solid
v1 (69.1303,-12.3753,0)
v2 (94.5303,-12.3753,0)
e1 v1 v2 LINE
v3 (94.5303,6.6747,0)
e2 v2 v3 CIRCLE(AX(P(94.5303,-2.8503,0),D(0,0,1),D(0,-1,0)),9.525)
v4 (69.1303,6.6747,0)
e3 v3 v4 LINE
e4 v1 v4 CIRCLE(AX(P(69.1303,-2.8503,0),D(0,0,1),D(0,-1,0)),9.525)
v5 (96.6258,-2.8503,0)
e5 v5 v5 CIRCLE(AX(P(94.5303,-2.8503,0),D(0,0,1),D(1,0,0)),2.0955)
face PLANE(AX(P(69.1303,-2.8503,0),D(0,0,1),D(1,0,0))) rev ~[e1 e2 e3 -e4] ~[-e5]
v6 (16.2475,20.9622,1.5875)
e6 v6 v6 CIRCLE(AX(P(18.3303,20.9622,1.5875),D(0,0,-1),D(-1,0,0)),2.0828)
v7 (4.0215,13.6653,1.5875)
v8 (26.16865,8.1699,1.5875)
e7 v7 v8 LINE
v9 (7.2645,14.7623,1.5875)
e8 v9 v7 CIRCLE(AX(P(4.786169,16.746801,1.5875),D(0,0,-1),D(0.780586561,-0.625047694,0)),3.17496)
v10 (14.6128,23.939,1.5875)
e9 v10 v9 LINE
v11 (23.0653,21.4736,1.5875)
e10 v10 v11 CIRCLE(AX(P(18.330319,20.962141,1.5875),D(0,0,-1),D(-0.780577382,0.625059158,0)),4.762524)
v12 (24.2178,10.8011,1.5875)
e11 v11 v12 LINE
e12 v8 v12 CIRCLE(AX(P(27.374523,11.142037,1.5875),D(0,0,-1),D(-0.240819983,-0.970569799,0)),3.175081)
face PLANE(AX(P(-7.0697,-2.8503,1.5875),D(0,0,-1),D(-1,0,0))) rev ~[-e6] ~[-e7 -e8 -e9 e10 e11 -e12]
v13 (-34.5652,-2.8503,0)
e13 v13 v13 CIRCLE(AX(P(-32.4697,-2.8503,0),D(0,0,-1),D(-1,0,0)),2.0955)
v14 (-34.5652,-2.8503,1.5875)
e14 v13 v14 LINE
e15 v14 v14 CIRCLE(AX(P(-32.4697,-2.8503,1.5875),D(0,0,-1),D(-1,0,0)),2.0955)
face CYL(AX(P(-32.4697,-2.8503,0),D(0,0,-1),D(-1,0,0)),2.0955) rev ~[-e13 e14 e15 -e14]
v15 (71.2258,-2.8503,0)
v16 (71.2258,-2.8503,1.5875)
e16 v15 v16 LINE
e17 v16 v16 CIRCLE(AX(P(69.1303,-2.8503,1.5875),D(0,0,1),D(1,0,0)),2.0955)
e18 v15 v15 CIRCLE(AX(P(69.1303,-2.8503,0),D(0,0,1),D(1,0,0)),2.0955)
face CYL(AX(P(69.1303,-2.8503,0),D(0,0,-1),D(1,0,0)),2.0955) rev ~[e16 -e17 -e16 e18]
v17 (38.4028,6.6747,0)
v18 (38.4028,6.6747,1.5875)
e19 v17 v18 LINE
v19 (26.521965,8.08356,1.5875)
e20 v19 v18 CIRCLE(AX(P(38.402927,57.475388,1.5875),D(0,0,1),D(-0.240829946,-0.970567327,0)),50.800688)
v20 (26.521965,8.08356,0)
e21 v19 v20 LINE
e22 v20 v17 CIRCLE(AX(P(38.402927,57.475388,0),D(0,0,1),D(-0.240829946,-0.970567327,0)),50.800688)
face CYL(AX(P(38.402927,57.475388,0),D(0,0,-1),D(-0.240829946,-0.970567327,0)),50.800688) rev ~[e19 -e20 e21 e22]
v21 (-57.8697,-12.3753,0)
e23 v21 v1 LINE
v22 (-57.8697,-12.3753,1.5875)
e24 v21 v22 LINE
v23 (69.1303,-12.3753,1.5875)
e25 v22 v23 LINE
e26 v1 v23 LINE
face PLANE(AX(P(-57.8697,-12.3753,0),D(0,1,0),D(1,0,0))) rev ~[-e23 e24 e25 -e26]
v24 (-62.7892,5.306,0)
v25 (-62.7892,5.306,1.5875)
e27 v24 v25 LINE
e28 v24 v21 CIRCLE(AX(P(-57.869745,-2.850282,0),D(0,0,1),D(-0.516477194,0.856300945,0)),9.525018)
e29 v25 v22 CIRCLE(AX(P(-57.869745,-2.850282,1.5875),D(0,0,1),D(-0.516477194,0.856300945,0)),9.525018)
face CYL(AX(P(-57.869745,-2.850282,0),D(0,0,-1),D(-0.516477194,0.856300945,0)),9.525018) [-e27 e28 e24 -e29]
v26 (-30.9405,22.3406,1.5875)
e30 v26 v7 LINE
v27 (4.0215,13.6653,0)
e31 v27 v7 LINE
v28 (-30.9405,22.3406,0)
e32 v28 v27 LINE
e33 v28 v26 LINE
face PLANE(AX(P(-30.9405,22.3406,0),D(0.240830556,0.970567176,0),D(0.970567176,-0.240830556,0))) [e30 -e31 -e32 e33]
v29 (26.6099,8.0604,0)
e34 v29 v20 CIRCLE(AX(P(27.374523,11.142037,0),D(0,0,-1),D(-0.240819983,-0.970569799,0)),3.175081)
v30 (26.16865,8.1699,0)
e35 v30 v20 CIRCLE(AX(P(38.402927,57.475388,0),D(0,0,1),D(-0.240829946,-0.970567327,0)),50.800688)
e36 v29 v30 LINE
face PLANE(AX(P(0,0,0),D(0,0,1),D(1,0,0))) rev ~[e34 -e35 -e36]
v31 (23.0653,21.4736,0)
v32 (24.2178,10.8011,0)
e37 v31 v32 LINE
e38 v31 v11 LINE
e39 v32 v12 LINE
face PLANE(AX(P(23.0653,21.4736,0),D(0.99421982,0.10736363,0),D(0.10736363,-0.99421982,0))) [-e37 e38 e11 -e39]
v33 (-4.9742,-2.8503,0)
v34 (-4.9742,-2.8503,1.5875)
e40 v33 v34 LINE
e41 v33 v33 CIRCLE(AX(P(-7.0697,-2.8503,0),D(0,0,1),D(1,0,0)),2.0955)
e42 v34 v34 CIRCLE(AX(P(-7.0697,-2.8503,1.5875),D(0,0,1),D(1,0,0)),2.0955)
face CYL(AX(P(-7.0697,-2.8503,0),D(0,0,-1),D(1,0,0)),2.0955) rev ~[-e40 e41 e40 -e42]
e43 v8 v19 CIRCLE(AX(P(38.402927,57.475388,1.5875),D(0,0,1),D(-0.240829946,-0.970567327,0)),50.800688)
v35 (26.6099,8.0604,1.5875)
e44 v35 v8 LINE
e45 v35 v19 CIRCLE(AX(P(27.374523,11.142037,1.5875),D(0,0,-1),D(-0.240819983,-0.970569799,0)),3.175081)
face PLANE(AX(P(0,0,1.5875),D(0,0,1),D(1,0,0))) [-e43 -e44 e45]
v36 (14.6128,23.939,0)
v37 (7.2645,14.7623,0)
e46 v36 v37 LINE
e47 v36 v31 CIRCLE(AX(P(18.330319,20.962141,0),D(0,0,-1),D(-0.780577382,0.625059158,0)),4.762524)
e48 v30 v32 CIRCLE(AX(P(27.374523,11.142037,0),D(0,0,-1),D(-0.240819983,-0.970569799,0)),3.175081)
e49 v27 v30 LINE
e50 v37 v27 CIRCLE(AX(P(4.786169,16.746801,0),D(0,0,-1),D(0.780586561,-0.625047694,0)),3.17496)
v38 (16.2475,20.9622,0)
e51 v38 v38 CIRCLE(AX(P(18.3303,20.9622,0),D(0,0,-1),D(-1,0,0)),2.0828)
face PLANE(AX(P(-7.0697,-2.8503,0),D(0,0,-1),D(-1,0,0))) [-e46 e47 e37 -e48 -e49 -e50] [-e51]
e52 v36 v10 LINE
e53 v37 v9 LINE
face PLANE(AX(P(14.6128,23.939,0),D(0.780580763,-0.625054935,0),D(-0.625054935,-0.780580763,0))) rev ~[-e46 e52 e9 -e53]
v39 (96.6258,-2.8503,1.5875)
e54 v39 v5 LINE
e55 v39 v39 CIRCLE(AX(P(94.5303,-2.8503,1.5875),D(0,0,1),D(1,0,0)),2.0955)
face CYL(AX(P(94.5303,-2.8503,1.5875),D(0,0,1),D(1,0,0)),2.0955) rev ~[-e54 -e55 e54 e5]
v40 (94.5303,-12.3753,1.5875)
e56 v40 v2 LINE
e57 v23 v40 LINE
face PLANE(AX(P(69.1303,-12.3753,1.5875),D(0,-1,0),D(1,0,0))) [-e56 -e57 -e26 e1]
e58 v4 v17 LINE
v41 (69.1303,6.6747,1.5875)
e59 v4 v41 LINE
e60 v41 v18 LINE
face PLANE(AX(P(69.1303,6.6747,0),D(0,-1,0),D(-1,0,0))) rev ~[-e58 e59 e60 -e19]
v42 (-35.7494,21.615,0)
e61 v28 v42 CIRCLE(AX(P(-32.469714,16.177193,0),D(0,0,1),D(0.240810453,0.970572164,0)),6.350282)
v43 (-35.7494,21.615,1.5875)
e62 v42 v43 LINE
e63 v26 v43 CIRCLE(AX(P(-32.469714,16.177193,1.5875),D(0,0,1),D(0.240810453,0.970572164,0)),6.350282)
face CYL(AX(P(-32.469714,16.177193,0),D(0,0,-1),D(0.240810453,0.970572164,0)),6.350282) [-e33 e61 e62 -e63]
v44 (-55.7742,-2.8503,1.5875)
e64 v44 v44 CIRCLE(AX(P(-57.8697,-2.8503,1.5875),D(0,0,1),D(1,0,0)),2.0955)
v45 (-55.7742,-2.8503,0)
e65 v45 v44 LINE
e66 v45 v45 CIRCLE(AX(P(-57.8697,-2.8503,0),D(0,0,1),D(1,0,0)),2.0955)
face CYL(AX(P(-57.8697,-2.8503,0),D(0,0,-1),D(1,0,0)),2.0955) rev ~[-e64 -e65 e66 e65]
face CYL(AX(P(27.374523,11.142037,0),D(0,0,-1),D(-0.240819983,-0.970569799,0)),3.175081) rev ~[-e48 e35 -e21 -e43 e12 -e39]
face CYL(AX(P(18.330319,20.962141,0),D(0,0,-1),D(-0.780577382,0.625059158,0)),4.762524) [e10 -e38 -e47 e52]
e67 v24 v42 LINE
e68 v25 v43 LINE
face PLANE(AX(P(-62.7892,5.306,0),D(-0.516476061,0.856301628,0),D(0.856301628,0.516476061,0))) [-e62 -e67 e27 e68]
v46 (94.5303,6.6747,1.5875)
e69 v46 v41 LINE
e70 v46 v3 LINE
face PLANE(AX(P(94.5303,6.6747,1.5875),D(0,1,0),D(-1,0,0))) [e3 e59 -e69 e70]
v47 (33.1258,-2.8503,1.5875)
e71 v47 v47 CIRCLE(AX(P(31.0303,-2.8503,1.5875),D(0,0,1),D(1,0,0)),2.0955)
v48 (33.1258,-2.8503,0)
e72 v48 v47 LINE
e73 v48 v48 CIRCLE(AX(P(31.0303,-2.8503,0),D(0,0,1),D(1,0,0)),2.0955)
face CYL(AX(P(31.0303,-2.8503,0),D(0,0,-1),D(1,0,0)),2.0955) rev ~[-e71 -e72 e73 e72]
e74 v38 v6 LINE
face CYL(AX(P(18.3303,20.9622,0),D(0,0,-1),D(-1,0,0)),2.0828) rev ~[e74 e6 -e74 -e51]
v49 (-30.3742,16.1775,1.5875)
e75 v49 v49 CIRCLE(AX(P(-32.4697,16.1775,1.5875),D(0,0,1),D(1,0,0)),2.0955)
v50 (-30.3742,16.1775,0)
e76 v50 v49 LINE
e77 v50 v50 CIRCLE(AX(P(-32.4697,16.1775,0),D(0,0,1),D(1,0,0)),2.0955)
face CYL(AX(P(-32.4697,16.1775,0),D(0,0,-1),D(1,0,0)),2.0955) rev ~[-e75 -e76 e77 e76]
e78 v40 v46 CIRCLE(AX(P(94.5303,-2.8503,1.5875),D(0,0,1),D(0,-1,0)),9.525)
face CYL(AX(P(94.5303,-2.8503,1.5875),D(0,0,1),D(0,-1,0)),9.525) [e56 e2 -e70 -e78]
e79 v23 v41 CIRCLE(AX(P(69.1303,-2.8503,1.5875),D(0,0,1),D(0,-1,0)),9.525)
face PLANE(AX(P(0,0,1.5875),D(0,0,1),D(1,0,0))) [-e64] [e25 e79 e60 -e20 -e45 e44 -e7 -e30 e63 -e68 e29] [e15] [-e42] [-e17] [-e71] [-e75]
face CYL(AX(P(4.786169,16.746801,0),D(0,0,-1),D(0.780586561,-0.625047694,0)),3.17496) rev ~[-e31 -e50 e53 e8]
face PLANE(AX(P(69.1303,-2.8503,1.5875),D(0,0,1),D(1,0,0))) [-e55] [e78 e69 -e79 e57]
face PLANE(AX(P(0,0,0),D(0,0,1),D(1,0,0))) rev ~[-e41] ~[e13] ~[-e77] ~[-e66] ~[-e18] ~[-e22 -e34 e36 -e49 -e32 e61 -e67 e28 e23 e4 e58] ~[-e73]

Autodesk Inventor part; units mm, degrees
ref_plane "YZ Plane" through (0, 0, 0) normal (1, 0, 0) x (0, 1, 0)
ref_plane "XZ Plane" through (0, 0, 0) normal (0, 1, 0) x (-1, 0, 0)
ref_plane "XY Plane" through (0, 0, 0) normal (0, 0, 1) x (1, 0, 0)
sketch "Sketch1" plane through (0, 0, 0) normal (0, 0, 1) x (1, 0, 0)
  circle A0 centre (-57.8697, -2.8503) radius 2.0955
  circle A1 centre (-7.0697, -2.8503) radius 2.0955
  circle A2 centre (31.0303, -2.8503) radius 2.0955
  circle A3 centre (69.1303, -2.8503) radius 2.0955
  arc A4 (-62.7892, 5.306) -> (-57.8697, -12.3753) centre (-57.8697, -2.8503) ccw
  arc A5 (-30.9405, 22.3406) -> (-35.7494, 21.615) centre (-32.4697, 16.1775) ccw
  arc A6 (69.1303, -12.3753) -> (69.1303, 6.6747) centre (69.1303, -2.8503) ccw
  line L0 (-57.8697, -12.3753) -> (69.1303, -12.3753)
  line L1 (-62.7892, 5.306) -> (-35.1787, 21.9592)
  line L2 (69.1303, 6.6747) -> (38.4028, 6.6747)
  line L3 (-30.9405, 22.3406) -> (26.1686, 8.1699)
  arc A7 (26.1686, 8.1699) -> (38.4028, 6.6747) centre (38.4028, 57.4747) ccw
  circle A8 centre (-32.4697, 16.1775) radius 2.0955
  point P0 (0, 0)
  dimension "d0" = 4.191
  dimension "d1" = 4.191
  dimension "d2" = 4.191
  dimension "d3" = 4.191
  dimension "d4" = 50.8
  dimension "d5" = 4.191
extrude "Extrusion1" add sketch "Sketch1" along normal blind 1.5875
sketch "Sketch2" plane through (-7.0697, -2.8503, 0) normal (0, 0, -1) x (-1, 0, 0)
  circle A0 centre (25.4, 0) radius 2.0955
  point P0 (-7.0697, 2.8503)
  dimension "d8" = 4.191
extrude "Extrusion2" cut sketch "Sketch2" against normal blind 1.5875
sketch "Sketch3" plane through (-7.0697, -2.8503, 0) normal (0, 0, -1) x (-1, 0, 0)
  line L0 (-21.6825, 26.7893) -> (-14.3342, 17.6126)
  line L1 (-30.135, 24.3239) -> (-31.2875, 13.6514)
  line L2 (-33.2384, 11.0202) -> (23.8707, 25.1909) projected
  line L3 (-33.6796, 10.9107) -> (-33.2384, 11.0202)
  arc A0 (-33.6796, 10.9107) -> (-31.2875, 13.6514) centre (-34.4442, 13.9923) ccw
  line L4 (23.8707, 25.1909) -> (-11.0912, 16.5156)
  arc A1 (-14.3342, 17.6126) -> (-11.0912, 16.5156) centre (-11.8558, 19.5972) ccw
  circle A2 centre (-25.4, 23.8125) radius 2.0828
  arc A3 (-21.6825, 26.7893) -> (-30.135, 24.3239) centre (-25.4, 23.8125) ccw
  point P0 (-7.0697, 2.8503)
  point P1 (-13.3897, 15.9453)
  point P2 (-13.0638, 16.0262)
  dimension "d19" = 3.175
  dimension "d20" = 3.175
  dimension "d21" = 4.1656
extrude "Extrusion3" add sketch "Sketch3" against normal blind 1.5875
sketch "Sketch5" plane through (69.1303, -2.8503, 1.5875) normal (0, 0, 1) x (1, 0, 0)
  circle A0 centre (25.4, 0) radius 2.0955
  arc A1 (25.4, -9.525) -> (25.4, 9.525) centre (25.4, 0) ccw
  line L0 (25.4, 9.525) -> (0, 9.525)
  arc A2 (0, -9.525) -> (0, 9.525) centre (0, 0) ccw projected
  line L1 (0, -9.525) -> (25.4, -9.525)
  point P0 (-69.1303, 2.8503)
  dimension "d26" = 4.191
extrude "Extrusion5" add sketch "Sketch5" against normal blind 1.5875
properties part number "intake_gusset" material "Acetal Resin, White"
